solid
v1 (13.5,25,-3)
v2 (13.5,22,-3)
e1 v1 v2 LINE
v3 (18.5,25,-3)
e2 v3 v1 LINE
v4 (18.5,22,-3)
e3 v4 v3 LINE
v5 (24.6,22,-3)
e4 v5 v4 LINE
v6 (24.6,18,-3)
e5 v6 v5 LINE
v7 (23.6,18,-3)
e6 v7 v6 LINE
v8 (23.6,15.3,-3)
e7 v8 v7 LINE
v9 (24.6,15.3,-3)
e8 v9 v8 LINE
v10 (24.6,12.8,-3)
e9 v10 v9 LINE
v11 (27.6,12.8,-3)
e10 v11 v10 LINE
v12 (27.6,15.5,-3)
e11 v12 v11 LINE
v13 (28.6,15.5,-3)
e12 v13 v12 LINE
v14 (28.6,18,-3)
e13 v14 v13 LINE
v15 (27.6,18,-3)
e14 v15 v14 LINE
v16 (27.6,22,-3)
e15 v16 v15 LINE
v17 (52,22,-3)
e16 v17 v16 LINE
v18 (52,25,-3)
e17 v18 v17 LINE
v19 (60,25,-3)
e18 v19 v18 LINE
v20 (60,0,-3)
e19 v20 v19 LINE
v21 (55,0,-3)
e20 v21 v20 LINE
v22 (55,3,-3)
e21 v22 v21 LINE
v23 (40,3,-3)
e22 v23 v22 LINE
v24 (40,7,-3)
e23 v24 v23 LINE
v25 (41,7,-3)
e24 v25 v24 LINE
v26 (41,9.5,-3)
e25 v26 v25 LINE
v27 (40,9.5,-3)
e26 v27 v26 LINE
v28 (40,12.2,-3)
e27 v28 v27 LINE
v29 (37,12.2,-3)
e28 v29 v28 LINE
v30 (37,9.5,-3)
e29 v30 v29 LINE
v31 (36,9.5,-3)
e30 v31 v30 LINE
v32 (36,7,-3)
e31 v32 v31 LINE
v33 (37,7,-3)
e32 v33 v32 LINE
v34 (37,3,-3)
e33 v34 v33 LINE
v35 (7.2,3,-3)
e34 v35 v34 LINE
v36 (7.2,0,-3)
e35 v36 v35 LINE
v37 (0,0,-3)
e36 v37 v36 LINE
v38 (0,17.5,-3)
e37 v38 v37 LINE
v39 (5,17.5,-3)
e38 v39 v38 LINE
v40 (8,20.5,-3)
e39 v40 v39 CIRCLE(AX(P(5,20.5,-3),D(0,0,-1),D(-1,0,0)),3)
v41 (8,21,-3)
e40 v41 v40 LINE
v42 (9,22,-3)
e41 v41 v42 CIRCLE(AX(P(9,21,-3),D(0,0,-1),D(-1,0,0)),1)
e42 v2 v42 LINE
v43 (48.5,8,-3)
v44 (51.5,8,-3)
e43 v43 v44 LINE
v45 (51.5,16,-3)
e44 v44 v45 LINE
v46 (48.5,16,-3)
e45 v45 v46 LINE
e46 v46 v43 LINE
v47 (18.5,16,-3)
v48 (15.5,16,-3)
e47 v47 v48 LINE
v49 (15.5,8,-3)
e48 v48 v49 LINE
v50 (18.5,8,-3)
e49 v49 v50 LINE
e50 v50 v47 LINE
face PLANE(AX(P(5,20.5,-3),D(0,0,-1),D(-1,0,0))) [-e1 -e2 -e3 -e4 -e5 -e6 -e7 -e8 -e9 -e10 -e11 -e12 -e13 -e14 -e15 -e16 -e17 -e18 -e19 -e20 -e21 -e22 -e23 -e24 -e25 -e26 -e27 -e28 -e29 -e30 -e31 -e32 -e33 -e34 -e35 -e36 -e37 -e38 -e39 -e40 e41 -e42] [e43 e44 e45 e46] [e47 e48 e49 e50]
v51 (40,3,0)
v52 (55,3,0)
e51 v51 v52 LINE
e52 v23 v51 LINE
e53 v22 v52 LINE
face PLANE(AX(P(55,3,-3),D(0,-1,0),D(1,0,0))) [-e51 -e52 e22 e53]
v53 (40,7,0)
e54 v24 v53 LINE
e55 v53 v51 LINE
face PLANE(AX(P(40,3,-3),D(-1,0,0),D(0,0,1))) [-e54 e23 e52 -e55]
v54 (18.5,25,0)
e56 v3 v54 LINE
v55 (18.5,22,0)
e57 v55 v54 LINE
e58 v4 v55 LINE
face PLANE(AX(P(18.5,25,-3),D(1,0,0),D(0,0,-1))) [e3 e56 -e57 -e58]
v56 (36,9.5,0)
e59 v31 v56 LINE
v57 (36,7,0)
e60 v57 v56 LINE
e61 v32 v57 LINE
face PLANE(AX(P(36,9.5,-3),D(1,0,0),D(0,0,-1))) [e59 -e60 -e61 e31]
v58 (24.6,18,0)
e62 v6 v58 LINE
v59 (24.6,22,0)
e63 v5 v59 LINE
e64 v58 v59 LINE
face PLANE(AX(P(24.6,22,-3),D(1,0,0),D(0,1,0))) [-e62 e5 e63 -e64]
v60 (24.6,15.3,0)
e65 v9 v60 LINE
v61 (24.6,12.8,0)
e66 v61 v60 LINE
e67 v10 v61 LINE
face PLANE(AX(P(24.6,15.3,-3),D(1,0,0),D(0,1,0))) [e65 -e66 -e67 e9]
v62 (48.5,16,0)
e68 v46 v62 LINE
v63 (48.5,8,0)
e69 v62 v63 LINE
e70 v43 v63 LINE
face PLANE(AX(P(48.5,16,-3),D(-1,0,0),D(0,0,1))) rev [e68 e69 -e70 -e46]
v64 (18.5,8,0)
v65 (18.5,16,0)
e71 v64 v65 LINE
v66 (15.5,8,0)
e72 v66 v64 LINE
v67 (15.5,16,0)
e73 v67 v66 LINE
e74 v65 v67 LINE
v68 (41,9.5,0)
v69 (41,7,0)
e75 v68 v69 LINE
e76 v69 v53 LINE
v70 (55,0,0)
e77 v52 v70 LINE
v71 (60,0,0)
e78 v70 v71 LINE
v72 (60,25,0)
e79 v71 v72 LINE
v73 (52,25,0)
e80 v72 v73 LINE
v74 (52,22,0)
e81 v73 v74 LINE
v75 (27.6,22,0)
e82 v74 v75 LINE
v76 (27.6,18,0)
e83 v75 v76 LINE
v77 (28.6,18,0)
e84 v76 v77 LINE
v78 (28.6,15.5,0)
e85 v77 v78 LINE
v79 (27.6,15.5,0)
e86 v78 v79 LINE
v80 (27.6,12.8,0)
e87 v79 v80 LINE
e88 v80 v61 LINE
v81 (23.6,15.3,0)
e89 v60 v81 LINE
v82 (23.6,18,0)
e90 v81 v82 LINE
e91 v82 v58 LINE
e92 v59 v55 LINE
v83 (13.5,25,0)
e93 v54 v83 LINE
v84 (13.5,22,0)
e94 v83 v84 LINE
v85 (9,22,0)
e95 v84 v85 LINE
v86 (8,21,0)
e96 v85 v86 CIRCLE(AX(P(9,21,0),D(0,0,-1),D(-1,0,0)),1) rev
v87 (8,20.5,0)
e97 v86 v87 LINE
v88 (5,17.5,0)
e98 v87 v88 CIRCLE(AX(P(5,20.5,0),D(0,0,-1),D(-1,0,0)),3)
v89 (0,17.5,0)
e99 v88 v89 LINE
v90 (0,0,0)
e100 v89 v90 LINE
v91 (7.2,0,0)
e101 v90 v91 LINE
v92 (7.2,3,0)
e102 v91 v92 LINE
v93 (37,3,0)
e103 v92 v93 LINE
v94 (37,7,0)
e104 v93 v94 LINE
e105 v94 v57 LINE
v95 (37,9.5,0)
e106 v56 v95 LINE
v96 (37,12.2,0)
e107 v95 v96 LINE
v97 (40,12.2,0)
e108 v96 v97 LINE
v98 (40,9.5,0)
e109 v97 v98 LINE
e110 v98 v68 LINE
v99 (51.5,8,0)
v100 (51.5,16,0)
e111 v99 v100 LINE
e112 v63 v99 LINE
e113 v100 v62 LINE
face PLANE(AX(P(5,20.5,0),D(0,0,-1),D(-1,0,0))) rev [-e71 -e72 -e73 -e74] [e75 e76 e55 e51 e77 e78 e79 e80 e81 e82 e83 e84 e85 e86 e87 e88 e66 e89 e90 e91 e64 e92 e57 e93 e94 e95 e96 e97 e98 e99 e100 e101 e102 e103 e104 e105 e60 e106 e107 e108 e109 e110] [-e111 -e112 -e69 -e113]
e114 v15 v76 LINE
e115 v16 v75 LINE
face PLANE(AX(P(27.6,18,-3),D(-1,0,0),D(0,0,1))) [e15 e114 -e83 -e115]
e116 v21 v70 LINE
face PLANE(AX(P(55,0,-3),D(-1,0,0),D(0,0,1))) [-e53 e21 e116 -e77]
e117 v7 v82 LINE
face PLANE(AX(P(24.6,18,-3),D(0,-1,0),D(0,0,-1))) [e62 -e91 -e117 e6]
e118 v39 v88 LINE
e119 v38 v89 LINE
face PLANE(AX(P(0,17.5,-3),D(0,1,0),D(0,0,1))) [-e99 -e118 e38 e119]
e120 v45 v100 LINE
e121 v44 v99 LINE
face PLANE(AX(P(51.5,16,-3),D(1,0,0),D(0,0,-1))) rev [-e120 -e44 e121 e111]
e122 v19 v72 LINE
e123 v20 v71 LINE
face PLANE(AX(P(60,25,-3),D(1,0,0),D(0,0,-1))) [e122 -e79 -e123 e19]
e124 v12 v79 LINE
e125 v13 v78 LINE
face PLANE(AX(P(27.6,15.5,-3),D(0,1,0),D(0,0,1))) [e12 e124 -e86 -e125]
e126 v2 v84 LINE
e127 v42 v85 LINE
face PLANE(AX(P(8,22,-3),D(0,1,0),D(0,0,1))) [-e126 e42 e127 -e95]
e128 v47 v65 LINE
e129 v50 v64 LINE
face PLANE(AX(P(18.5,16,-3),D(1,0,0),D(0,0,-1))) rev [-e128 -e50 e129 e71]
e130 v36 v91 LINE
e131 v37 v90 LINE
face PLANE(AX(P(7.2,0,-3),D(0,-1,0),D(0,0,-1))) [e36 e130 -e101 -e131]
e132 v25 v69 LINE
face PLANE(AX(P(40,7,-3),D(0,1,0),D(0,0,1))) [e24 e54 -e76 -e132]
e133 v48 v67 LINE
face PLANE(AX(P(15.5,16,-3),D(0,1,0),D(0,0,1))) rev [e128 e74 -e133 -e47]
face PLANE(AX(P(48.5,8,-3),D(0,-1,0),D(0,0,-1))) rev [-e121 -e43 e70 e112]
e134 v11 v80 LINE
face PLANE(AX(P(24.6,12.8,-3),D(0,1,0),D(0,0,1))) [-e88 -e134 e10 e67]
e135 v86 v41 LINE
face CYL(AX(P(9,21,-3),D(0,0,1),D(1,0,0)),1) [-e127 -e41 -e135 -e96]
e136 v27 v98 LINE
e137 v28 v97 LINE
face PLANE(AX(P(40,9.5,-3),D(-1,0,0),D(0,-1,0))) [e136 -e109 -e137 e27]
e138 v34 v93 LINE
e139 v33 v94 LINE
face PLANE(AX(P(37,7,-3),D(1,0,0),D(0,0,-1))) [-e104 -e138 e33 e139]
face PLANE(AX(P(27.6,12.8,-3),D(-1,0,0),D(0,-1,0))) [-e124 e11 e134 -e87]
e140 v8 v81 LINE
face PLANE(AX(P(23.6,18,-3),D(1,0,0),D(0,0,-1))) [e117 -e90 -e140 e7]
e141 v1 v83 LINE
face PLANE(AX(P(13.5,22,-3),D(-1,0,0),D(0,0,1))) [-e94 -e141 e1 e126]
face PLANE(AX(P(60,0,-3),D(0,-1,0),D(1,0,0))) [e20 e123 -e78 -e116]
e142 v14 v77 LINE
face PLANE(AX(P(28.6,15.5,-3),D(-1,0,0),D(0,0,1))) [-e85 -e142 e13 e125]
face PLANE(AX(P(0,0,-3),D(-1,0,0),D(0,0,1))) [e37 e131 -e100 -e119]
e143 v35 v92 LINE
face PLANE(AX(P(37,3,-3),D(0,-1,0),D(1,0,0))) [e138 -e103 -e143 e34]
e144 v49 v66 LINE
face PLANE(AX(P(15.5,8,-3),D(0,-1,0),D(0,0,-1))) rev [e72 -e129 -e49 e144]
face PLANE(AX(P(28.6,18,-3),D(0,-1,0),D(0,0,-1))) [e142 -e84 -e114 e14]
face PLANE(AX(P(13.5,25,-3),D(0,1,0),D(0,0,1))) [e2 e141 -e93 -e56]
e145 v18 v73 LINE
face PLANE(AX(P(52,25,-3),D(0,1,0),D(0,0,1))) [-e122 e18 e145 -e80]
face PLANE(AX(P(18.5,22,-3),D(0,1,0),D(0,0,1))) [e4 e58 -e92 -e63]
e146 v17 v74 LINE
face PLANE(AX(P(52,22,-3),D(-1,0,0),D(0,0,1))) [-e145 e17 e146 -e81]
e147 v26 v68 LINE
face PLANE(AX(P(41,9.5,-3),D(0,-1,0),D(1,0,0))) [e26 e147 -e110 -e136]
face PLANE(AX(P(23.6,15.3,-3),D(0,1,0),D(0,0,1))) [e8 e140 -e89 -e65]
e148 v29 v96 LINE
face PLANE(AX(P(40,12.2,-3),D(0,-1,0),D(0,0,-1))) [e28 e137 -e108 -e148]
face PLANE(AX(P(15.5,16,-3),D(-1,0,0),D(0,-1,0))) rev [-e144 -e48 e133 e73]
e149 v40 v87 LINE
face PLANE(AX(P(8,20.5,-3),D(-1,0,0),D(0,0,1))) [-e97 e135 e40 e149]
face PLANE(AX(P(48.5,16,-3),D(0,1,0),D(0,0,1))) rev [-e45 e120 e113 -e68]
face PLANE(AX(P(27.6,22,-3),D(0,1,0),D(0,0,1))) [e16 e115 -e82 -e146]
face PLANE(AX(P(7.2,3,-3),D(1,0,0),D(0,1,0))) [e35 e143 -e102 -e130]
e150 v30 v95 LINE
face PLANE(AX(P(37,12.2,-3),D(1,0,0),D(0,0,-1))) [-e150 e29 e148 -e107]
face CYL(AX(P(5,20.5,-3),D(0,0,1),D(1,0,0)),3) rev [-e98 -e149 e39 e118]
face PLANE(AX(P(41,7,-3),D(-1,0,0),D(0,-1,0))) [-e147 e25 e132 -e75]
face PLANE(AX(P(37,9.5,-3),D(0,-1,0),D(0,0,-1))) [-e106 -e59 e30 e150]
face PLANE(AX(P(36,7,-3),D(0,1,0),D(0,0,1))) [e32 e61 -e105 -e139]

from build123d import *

# Parameters (mm, degrees)
ESQUISSE1_W               = 3
ESQUISSE1_H               = 8
T_LE_DE_BASE_PLI_E1_DEPTH = 3
CONG_1_R                  = 1


# Sheet-metal steps are written as plain solids
with BuildPart() as part:
    # Esquisse1 → Tôle de base pliée1 (new body)
    with BuildSketch(Plane.XY):
        with BuildLine():
            Line((60, 25), (60, 0))
            Line((60, 0), (55, 0))
            Line((55, 0), (55, 3))
            Line((55, 3), (40, 3))
            Line((40, 3), (40, 7))
            Line((40, 7), (41, 7))
            Line((41, 7), (41, 9.5))
            Line((41, 9.5), (40, 9.5))
            Line((40, 9.5), (40, 12.2))
            Line((40, 12.2), (37, 12.2))
            Line((37, 12.2), (37, 9.5))
            Line((37, 9.5), (36, 9.5))
            Line((36, 9.5), (36, 7))
            Line((36, 7), (37, 7))
            Line((37, 7), (37, 3))
            Line((37, 3), (7.2, 3))
            Line((7.2, 3), (7.2, 0))
            Line((7.2, 0), (0, 0))
            Line((0, 0), (0, 17.5))
            Line((0, 17.5), (5, 17.5))
            ThreePointArc((5, 17.5), (7.121320344, 18.378679656), (8, 20.5))
            Line((8, 20.5), (8, 22))
            Line((8, 22), (13.5, 22))
            Line((13.5, 22), (13.5, 25))
            Line((13.5, 25), (18.5, 25))
            Line((18.5, 25), (18.5, 22))
            Line((18.5, 22), (24.6, 22))
            Line((24.6, 22), (24.6, 18))
            Line((24.6, 18), (23.6, 18))
            Line((23.6, 18), (23.6, 15.3))
            Line((23.6, 15.3), (24.6, 15.3))
            Line((24.6, 15.3), (24.6, 12.8))
            Line((24.6, 12.8), (27.6, 12.8))
            Line((27.6, 12.8), (27.6, 15.5))
            Line((27.6, 15.5), (28.6, 15.5))
            Line((28.6, 15.5), (28.6, 18))
            Line((28.6, 18), (27.6, 18))
            Line((27.6, 18), (27.6, 22))
            Line((27.6, 22), (52, 22))
            Line((52, 22), (52, 25))
            Line((52, 25), (60, 25))
        make_face()
        with Locations((17, 12)):
            Rectangle(ESQUISSE1_W, ESQUISSE1_H, mode=Mode.SUBTRACT)
        with Locations((50, 12)):
            Rectangle(ESQUISSE1_W, ESQUISSE1_H, mode=Mode.SUBTRACT)
    extrude(amount=-T_LE_DE_BASE_PLI_E1_DEPTH)

    # Congé1
    cong_1_edges = [part.edges().sort_by_distance(p)[0] for p in [
        (8, 22, -1.5),
    ]]
    fillet(cong_1_edges, radius=CONG_1_R)


solid = part.part
